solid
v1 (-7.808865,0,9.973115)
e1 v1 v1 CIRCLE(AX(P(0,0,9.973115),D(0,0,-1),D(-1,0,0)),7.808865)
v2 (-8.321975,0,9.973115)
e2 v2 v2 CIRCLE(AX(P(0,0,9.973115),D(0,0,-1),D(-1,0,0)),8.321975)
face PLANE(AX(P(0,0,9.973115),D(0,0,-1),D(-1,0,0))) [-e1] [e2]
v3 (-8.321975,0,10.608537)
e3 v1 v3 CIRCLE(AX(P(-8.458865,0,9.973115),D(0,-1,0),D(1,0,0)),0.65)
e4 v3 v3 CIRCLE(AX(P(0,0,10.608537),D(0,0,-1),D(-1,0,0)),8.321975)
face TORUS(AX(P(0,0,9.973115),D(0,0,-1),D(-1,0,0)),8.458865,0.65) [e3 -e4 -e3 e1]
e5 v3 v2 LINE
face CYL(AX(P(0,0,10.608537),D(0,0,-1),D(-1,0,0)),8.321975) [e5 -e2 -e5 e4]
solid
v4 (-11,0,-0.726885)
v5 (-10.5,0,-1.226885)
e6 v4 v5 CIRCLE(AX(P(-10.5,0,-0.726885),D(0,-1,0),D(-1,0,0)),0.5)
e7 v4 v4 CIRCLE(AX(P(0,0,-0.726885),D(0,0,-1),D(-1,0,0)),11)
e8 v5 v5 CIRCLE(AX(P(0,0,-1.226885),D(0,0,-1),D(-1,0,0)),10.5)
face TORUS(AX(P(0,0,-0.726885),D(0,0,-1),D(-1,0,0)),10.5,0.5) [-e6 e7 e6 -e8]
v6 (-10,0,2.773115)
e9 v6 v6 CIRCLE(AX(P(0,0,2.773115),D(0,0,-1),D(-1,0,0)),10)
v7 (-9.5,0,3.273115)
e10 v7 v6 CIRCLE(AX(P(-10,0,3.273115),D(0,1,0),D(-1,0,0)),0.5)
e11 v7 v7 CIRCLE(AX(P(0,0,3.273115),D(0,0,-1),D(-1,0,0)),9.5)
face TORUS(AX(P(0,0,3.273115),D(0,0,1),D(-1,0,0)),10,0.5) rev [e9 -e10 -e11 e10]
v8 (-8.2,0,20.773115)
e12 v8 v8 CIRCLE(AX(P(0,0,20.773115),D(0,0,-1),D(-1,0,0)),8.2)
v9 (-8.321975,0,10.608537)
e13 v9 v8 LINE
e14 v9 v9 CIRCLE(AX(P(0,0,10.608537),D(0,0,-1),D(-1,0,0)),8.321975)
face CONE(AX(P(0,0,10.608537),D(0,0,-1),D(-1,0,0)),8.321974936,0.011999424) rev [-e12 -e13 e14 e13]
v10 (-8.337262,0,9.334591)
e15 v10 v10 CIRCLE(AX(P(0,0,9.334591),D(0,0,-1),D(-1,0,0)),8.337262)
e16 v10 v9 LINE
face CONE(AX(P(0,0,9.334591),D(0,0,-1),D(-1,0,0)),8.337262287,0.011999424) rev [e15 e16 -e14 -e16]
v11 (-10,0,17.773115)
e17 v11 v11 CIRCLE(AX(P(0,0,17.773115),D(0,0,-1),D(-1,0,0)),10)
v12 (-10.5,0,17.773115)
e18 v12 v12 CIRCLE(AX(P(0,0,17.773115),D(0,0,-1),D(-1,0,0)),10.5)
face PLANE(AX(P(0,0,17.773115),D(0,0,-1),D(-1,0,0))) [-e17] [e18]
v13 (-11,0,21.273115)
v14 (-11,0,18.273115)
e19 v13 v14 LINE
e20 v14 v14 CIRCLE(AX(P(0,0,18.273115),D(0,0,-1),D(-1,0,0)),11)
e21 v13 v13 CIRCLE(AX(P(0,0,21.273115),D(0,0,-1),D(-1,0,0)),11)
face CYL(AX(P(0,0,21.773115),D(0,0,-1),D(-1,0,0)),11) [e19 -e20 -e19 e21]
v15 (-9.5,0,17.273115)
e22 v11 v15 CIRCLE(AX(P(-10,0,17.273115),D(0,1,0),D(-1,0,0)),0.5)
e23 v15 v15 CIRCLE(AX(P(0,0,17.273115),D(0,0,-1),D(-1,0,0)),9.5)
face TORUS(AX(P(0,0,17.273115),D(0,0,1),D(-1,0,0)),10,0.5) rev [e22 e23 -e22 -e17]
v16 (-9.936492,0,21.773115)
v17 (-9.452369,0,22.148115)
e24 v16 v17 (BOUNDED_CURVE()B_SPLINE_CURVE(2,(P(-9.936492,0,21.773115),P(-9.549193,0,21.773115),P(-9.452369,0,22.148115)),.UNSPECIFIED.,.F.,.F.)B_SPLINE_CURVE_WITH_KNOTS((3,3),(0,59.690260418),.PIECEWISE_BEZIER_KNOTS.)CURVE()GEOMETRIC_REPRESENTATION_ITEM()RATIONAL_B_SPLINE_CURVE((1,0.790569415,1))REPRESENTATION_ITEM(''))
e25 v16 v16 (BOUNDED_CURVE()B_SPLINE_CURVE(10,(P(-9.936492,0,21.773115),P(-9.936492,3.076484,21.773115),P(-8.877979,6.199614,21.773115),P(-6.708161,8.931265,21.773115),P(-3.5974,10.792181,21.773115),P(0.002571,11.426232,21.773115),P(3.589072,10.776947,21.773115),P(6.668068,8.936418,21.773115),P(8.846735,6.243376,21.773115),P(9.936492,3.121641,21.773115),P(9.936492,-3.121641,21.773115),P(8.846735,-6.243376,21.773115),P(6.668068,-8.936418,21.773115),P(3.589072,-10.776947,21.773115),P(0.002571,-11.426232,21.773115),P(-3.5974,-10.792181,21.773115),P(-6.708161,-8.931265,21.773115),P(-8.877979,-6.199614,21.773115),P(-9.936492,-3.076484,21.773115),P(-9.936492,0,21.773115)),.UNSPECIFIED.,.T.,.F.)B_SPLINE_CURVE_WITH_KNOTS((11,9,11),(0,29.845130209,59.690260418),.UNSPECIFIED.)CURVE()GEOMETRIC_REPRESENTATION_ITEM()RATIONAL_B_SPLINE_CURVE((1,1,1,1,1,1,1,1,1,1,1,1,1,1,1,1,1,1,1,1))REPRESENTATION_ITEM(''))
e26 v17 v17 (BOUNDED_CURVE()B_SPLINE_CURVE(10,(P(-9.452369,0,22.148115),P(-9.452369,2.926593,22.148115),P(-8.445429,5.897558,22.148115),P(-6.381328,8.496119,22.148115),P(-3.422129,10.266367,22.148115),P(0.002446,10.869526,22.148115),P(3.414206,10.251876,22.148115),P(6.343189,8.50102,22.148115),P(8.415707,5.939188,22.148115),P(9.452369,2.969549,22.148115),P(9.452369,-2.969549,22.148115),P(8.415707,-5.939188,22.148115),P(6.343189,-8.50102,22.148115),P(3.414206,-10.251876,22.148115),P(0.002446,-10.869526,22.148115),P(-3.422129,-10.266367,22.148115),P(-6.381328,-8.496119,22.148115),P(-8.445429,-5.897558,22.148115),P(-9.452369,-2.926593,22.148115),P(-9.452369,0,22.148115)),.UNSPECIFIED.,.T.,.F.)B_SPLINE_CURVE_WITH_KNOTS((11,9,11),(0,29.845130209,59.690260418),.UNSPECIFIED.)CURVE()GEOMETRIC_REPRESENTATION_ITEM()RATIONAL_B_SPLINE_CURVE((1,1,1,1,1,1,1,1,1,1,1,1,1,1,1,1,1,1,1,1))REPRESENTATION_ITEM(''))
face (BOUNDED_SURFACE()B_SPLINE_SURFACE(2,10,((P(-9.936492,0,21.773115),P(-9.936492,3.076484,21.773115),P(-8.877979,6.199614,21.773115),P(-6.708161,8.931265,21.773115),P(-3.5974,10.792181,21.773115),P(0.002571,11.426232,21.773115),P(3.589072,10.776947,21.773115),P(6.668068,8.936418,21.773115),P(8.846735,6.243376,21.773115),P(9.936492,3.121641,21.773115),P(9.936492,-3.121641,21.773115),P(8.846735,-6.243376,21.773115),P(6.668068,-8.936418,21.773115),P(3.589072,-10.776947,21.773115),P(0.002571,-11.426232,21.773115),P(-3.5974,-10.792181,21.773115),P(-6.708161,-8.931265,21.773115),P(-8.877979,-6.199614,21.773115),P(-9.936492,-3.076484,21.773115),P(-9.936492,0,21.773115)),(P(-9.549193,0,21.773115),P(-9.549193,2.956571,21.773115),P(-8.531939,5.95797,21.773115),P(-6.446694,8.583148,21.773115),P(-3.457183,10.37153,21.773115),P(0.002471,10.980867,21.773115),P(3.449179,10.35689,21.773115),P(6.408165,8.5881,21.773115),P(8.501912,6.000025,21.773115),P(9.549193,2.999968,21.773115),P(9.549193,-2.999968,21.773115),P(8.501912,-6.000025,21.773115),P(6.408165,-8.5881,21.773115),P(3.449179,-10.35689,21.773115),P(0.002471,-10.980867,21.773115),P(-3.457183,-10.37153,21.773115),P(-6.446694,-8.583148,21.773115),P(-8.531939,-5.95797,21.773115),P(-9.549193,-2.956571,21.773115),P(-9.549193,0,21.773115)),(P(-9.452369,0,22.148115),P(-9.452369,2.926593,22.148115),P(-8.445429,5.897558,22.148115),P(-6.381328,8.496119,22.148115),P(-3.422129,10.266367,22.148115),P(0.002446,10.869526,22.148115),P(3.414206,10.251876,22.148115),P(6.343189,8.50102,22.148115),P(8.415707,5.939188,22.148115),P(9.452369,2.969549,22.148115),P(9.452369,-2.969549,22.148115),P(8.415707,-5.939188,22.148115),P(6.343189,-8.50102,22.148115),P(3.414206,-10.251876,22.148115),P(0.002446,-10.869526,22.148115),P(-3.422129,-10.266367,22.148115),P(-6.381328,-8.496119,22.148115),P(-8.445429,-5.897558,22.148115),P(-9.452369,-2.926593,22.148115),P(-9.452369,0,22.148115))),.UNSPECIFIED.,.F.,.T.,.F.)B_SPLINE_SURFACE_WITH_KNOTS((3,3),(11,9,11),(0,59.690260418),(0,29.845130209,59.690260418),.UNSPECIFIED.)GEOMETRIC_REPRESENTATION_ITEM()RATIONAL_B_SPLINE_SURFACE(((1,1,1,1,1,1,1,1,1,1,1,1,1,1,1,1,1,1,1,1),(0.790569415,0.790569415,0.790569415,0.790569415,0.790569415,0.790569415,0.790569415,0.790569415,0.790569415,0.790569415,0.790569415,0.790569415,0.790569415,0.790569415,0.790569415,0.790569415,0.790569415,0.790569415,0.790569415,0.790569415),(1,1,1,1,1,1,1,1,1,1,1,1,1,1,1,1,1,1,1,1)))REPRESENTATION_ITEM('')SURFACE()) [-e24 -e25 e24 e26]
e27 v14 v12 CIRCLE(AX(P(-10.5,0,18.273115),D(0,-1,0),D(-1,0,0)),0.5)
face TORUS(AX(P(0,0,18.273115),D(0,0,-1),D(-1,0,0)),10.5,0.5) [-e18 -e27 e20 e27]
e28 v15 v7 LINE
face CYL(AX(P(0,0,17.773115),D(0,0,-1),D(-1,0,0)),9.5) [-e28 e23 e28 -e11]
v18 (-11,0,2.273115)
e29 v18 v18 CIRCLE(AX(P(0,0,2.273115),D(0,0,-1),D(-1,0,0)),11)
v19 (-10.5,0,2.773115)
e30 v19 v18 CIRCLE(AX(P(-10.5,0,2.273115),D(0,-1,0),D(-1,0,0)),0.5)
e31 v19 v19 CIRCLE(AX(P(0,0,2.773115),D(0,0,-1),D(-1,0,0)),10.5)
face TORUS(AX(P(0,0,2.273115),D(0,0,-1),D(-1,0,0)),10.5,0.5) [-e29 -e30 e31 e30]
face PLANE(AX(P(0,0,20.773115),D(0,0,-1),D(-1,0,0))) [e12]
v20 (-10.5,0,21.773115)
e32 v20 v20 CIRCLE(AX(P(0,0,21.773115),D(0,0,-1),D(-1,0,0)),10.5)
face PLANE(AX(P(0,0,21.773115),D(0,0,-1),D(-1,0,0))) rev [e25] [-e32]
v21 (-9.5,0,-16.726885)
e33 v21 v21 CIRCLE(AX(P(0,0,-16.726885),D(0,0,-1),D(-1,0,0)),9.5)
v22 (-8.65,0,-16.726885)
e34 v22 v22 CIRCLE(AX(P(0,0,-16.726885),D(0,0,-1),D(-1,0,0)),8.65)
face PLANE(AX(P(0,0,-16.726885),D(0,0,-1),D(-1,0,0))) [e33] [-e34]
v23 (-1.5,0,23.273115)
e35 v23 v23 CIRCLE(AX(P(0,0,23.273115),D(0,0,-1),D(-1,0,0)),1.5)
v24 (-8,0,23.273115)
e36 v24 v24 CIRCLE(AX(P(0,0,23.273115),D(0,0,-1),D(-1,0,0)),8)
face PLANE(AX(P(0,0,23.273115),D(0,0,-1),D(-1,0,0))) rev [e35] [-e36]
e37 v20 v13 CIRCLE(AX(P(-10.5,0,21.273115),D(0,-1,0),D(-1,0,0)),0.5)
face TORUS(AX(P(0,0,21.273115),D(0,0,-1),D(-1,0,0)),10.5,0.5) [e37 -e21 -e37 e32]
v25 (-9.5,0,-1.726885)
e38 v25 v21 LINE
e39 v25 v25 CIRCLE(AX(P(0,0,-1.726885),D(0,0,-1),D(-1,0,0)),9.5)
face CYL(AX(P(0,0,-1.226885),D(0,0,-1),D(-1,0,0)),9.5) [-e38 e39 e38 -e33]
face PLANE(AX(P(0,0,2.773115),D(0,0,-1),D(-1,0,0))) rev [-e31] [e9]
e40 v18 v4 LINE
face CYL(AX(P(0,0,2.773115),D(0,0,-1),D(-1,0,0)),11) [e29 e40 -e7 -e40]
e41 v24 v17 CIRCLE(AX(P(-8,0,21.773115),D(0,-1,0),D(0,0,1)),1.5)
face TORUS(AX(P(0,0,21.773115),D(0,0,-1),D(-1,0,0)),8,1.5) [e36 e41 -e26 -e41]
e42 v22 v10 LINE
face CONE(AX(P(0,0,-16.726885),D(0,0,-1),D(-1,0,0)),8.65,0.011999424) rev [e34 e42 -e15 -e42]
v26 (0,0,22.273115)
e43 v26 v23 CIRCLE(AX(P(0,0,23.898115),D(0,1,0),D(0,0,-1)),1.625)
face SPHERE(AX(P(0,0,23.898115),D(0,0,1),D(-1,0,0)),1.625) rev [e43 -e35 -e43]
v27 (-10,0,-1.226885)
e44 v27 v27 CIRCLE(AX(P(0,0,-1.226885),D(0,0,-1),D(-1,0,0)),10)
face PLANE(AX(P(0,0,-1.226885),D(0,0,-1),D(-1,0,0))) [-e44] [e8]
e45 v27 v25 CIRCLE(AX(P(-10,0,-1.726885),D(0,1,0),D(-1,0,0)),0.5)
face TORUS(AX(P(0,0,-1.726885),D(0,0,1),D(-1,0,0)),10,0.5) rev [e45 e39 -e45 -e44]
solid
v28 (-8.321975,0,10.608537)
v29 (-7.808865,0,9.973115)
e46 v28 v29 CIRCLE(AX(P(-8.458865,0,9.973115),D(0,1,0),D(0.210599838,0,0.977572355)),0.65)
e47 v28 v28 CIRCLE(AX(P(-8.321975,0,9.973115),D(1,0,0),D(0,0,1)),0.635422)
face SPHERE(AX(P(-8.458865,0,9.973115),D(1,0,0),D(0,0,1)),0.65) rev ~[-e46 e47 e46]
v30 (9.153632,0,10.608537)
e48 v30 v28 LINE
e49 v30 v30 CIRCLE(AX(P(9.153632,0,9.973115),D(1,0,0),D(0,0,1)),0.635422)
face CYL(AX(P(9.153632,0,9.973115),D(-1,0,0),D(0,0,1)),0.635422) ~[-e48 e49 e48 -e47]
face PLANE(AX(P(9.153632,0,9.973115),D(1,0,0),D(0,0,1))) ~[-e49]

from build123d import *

# Parameters (mm, degrees)
F2_R = 0.5
F3_R = 0.5


with BuildPart() as f1:
    # F0 (on Front) → F1 (revolve)
    with BuildSketch(Plane.XZ):
        with BuildLine():
            Line((-9.5, -16.7268847123), (-8.65, -16.7268847123))
            Line((-8.65, -16.7268847123), (-8.3372622873, 9.334591348))
            Line((-8.3372622873, 9.334591348), (-8.3219749356, 10.6085373182))
            Line((-8.3219749356, 10.6085373182), (-8.2, 20.7731152877))
            Line((-8.2, 20.7731152877), (0, 20.7731152877))
            Line((0, 20.7731152877), (0, 22.2731152877))
            ThreePointArc((0, 22.2731152877), (-0.9013878189, 22.5460335594), (-1.5, 23.2731152877))
            Line((-1.5, 23.2731152877), (-8, 23.2731152877))
            ThreePointArc((-8, 23.2731152877), (-9.0606601718, 22.8337754595), (-9.5, 21.7731152877))
            Line((-9.5, 21.7731152877), (-11, 21.7731152877))
            Line((-11, 21.7731152877), (-11, 17.7731152877))
            Line((-11, 17.7731152877), (-9.5, 17.7731152877))
            Line((-9.5, 17.7731152877), (-9.5, 2.7731152877))
            Line((-9.5, 2.7731152877), (-11, 2.7731152877))
            Line((-11, 2.7731152877), (-11, -1.2268847123))
            Line((-11, -1.2268847123), (-9.5, -1.2268847123))
            Line((-9.5, -1.2268847123), (-9.5, -16.7268847123))
        make_face()
    revolve(axis=Axis((0, 0, 4.3270599525), (0, 0, -1)))

    # F2
    f2_edges = [f1.edges().sort_by_distance(p)[0] for p in [
        (11, 0, 21.773115),
        (11, 0, 17.773115),
        (11, 0, 2.773115),
        (11, 0, -1.226885),
    ]]
    fillet(f2_edges, radius=F2_R)

    # F3
    f3_edges = [f1.edges().sort_by_distance(p)[0] for p in [
        (9.5, 0, 17.773115),
        (9.5, 0, 2.773115),
        (9.5, 0, 21.773115),
        (9.5, 0, -1.226885),
    ]]
    fillet(f3_edges, radius=F3_R)


with BuildPart() as f1b:
    # F0 (on Front) → F1, piece 2 (revolve)
    with BuildSketch(Plane.XZ):
        with BuildLine():
            ThreePointArc((-7.8088648302, 9.9731152877), (-7.9531581803, 10.381478832), (-8.3219749356, 10.6085373182))
            Line((-8.3219749356, 10.6085373182), (-8.3219749356, 9.9731152877))
            Line((-8.3219749356, 9.9731152877), (-7.8088648302, 9.9731152877))
        make_face()
    revolve(axis=Axis((0, 0, 4.3270599525), (0, 0, -1)))


with BuildPart() as f4:
    # F0 (on Front) → F4 (revolve)
    with BuildSketch(Plane.XZ):
        with BuildLine():
            Line((9.1536324471, 10.6085373182), (-8.3219749356, 10.6085373182))
            ThreePointArc((-8.3219749356, 10.6085373182), (-7.9531581803, 10.381478832), (-7.8088648302, 9.9731152877))
            Line((-7.8088648302, 9.9731152877), (9.1536324471, 9.9731152877))
            Line((9.1536324471, 9.9731152877), (9.1536324471, 10.6085373182))
        make_face()
    revolve(axis=Axis((0.4158287557, 0, 9.9731152877), (1, 0, 0)))


solid = Compound([f1.part, f1b.part, f4.part])
